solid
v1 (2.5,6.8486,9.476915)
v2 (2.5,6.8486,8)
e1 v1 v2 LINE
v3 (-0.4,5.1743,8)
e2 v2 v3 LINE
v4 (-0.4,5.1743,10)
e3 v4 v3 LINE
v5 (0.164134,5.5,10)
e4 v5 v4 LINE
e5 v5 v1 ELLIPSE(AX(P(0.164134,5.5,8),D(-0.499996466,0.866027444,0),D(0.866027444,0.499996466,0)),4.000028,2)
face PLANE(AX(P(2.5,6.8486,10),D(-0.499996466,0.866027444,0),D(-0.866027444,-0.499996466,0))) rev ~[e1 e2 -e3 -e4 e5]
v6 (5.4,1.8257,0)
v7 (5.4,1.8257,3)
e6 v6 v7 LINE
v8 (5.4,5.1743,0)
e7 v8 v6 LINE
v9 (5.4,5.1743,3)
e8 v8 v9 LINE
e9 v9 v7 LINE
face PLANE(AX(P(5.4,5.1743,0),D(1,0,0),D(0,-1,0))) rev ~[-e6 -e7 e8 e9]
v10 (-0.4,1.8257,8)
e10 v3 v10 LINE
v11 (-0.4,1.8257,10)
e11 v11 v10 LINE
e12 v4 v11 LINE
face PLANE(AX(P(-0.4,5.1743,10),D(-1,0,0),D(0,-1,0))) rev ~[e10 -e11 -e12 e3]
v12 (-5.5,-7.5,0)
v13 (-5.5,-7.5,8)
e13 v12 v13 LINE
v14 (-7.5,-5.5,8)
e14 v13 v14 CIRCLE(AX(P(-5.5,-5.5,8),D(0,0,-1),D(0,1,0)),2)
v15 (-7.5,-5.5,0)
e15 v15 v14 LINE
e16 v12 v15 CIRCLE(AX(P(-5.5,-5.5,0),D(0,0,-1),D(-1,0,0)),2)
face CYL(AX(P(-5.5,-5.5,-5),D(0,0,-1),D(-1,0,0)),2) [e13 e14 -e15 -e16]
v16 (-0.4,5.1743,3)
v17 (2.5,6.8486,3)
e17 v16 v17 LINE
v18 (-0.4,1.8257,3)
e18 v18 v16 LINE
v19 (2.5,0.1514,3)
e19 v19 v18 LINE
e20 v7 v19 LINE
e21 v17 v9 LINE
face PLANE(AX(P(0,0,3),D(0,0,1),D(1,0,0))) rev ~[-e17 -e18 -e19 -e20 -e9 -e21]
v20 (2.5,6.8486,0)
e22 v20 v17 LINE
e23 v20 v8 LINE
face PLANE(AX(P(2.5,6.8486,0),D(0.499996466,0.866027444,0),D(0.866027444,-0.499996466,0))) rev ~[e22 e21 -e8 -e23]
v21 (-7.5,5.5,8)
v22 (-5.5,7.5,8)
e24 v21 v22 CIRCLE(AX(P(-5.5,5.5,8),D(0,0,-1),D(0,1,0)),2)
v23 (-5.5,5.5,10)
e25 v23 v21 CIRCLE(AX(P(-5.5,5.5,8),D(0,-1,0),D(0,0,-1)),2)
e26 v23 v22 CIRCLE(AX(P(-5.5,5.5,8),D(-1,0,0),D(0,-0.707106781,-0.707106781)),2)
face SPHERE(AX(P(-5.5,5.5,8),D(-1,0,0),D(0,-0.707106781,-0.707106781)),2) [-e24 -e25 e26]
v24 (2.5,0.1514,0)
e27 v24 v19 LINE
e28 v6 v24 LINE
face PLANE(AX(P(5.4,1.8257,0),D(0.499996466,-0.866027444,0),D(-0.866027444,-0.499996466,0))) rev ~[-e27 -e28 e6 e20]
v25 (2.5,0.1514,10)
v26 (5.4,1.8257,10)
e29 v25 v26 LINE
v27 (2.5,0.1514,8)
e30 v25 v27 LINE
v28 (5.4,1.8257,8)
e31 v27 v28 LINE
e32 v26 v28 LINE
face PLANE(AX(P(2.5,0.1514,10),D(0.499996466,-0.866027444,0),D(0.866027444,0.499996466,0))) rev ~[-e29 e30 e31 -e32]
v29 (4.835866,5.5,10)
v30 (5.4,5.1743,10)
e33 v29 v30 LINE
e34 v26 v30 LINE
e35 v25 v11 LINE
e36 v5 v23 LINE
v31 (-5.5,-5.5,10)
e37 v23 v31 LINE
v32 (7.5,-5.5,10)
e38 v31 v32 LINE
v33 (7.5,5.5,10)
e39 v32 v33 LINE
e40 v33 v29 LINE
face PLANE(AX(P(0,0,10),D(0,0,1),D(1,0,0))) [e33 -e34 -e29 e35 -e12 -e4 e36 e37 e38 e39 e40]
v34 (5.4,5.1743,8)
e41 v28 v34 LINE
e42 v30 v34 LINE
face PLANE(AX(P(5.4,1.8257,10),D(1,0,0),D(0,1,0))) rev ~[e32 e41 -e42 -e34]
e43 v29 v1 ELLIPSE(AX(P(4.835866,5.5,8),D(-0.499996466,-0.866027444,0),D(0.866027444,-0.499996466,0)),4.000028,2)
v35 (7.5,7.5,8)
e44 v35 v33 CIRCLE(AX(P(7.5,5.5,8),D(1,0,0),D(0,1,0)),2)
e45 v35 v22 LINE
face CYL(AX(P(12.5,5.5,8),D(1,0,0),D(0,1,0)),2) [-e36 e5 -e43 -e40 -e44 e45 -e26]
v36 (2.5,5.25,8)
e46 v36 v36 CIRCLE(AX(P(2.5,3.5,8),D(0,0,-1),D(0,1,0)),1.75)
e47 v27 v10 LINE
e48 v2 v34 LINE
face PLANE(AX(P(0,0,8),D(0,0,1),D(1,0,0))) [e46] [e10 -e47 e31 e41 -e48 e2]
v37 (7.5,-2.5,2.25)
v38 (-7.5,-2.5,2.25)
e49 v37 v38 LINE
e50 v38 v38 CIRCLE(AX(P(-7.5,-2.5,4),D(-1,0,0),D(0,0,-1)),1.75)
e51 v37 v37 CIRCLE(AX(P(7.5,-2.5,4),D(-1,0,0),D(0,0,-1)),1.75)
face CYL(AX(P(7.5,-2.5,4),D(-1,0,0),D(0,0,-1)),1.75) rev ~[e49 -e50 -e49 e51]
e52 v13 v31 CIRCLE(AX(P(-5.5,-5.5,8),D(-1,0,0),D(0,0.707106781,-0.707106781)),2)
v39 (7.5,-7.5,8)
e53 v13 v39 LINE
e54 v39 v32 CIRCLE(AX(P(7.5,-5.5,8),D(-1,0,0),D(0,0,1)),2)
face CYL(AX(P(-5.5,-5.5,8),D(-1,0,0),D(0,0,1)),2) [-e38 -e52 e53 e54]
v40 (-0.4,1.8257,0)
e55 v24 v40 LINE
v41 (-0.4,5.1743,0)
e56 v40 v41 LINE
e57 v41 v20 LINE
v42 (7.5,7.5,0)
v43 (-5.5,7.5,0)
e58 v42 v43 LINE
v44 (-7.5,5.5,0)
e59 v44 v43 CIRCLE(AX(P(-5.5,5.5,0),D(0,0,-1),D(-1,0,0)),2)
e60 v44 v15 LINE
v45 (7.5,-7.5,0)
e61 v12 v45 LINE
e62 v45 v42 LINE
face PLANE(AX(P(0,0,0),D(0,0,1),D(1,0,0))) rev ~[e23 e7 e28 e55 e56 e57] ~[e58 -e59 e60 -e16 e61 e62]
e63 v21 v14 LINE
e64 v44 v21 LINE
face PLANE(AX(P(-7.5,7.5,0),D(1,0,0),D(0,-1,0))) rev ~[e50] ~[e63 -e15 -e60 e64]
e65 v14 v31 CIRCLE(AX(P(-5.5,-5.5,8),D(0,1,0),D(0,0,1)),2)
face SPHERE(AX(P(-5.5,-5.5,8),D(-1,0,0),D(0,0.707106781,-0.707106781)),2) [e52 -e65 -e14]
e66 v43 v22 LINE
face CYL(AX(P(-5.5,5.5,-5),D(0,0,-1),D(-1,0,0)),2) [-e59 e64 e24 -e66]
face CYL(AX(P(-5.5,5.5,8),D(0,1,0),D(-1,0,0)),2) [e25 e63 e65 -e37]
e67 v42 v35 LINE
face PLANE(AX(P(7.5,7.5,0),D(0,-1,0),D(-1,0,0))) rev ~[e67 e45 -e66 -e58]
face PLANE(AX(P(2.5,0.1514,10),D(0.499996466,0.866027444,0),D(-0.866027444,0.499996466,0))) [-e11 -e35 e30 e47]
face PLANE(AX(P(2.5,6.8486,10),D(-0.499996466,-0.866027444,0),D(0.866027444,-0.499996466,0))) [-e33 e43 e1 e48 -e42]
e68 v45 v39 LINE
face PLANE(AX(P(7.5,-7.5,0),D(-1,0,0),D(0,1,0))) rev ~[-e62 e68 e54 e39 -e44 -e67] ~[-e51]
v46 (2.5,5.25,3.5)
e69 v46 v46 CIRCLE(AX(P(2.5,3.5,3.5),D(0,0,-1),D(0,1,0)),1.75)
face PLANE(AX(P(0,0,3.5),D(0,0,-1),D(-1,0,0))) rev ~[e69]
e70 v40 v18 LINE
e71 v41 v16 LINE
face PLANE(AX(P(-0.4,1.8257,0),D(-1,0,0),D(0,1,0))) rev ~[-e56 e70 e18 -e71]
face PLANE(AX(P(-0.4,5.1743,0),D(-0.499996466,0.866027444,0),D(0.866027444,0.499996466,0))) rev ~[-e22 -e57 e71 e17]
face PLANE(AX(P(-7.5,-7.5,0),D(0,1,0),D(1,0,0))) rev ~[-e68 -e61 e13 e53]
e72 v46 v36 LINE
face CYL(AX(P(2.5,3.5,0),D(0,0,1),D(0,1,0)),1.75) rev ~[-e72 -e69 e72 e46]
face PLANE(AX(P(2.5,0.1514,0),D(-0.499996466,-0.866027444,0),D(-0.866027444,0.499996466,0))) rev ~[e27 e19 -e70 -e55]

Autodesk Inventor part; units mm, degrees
ref_plane "YZ Plane" through (0, 0, 0) normal (1, 0, 0) x (0, 1, 0)
ref_plane "XZ Plane" through (0, 0, 0) normal (0, 1, 0) x (-1, 0, 0)
ref_plane "XY Plane" through (0, 0, 0) normal (0, 0, 1) x (1, 0, 0)
sketch "Szkic1" plane through (0, 0, 0) normal (0, 0, 1) x (1, 0, 0)
  line L0 (-7.5, -7.5) -> (7.5, -7.5)
  line L1 (7.5, -7.5) -> (7.5, 7.5)
  line L2 (7.5, 7.5) -> (-7.5, 7.5)
  line L3 (-7.5, 7.5) -> (-7.5, -7.5)
  line L4 (-7.5, -7.5) -> (7.5, 7.5) construction
  line L5 (7.5, -7.5) -> (-7.5, 7.5) construction
  line L6 (7.5, 7.5) -> (2.5, 7.5) construction
  line L7 (2.5, 7.5) -> (2.5, 3.5) construction
  line L8 (2.5, 3.5) -> (7.5, 3.5) construction
  line L9 (7.5, 3.5) -> (7.5, 7.5) construction
  line L10 (2.5, 6.8486) -> (5.4, 5.1743)
  line L11 (5.4, 5.1743) -> (5.4, 1.8257)
  line L12 (5.4, 1.8257) -> (2.5, 0.1514)
  line L13 (2.5, 0.1514) -> (-0.4, 1.8257)
  line L14 (-0.4, 1.8257) -> (-0.4, 5.1743)
  line L15 (-0.4, 5.1743) -> (2.5, 6.8486)
  point P0 (0, 0)
  dimension "d0" = 15
  dimension "d1" = 15
  dimension "d4" = 5
  dimension "d5" = 4
  dimension "d8" = 5.8
extrude "Wyciągnięcie proste1" add sketch "Szkic1" along normal blind 10 contours L3 L2 L1 L0 | L10 L11 L12 L13 L14 L15
sketch "Szkic2" plane through (7.5, -7.5, 0) normal (1, 0, 0) x (0, 0, -1)
  line L0 (0, 0) -> (-4, 0) construction
  line L1 (-4, 0) -> (-4, 5) construction
  line L2 (-4, 5) -> (0, 5) construction
  line L3 (0, 5) -> (0, 0) construction
  point P0 (0, 7.5)
  dimension "d6" = 4
  dimension "d7" = 5
hole "Otwór1" at (2.5, 3.5, 0) direction (0, 0, 1) diameter 3.5 end through all
extrude "Wyciągnięcie proste2" cut sketch "Szkic1" along normal blind 3 contours L10 L11 L12 L13 L14 L15
hole "Otwór2" at (7.5, -2.5, 4) direction (-1, 0, 0) diameter 3.5 end through all
sketch "Szkic3" plane through (0, 0, 10) normal (0, 0, 1) x (1, 0, 0)
  circle A0 centre (2.5, 3.5) radius 1.75 projected
  line L0 (-0.4, 5.1743) -> (-0.4, 1.8257) projected
  line L1 (2.5, 6.8486) -> (-0.4, 5.1743) projected
  line L2 (2.5, 6.8486) -> (5.4, 5.1743) projected
  line L3 (5.4, 1.8257) -> (5.4, 5.1743) projected
  line L4 (2.5, 0.1514) -> (5.4, 1.8257) projected
  line L5 (2.5, 0.1514) -> (-0.4, 1.8257) projected
  point P0 (0, 0)
extrude "Wyciągnięcie proste3" cut sketch "Szkic3" against normal blind 2
fillet "Zaokrąglenie1" radius 2 5 edges at (-7.5, 7.5, 5) (-7.5, -7.5, 5) (-7.5, 0, 10) (0, 7.5, 10) (0, -7.5, 10)
sketch "Szkic4" plane through (0, 0, 3) normal (0, 0, -1) x (-1, 0, 0)
  circle A0 centre (-2.5, 3.5) radius 1.75 projected
  point P0 (0, 0)
extrude "Wyciągnięcie proste4" add sketch "Szkic4" against normal blind 0.5
properties part number "Z_endstop_regulator"
